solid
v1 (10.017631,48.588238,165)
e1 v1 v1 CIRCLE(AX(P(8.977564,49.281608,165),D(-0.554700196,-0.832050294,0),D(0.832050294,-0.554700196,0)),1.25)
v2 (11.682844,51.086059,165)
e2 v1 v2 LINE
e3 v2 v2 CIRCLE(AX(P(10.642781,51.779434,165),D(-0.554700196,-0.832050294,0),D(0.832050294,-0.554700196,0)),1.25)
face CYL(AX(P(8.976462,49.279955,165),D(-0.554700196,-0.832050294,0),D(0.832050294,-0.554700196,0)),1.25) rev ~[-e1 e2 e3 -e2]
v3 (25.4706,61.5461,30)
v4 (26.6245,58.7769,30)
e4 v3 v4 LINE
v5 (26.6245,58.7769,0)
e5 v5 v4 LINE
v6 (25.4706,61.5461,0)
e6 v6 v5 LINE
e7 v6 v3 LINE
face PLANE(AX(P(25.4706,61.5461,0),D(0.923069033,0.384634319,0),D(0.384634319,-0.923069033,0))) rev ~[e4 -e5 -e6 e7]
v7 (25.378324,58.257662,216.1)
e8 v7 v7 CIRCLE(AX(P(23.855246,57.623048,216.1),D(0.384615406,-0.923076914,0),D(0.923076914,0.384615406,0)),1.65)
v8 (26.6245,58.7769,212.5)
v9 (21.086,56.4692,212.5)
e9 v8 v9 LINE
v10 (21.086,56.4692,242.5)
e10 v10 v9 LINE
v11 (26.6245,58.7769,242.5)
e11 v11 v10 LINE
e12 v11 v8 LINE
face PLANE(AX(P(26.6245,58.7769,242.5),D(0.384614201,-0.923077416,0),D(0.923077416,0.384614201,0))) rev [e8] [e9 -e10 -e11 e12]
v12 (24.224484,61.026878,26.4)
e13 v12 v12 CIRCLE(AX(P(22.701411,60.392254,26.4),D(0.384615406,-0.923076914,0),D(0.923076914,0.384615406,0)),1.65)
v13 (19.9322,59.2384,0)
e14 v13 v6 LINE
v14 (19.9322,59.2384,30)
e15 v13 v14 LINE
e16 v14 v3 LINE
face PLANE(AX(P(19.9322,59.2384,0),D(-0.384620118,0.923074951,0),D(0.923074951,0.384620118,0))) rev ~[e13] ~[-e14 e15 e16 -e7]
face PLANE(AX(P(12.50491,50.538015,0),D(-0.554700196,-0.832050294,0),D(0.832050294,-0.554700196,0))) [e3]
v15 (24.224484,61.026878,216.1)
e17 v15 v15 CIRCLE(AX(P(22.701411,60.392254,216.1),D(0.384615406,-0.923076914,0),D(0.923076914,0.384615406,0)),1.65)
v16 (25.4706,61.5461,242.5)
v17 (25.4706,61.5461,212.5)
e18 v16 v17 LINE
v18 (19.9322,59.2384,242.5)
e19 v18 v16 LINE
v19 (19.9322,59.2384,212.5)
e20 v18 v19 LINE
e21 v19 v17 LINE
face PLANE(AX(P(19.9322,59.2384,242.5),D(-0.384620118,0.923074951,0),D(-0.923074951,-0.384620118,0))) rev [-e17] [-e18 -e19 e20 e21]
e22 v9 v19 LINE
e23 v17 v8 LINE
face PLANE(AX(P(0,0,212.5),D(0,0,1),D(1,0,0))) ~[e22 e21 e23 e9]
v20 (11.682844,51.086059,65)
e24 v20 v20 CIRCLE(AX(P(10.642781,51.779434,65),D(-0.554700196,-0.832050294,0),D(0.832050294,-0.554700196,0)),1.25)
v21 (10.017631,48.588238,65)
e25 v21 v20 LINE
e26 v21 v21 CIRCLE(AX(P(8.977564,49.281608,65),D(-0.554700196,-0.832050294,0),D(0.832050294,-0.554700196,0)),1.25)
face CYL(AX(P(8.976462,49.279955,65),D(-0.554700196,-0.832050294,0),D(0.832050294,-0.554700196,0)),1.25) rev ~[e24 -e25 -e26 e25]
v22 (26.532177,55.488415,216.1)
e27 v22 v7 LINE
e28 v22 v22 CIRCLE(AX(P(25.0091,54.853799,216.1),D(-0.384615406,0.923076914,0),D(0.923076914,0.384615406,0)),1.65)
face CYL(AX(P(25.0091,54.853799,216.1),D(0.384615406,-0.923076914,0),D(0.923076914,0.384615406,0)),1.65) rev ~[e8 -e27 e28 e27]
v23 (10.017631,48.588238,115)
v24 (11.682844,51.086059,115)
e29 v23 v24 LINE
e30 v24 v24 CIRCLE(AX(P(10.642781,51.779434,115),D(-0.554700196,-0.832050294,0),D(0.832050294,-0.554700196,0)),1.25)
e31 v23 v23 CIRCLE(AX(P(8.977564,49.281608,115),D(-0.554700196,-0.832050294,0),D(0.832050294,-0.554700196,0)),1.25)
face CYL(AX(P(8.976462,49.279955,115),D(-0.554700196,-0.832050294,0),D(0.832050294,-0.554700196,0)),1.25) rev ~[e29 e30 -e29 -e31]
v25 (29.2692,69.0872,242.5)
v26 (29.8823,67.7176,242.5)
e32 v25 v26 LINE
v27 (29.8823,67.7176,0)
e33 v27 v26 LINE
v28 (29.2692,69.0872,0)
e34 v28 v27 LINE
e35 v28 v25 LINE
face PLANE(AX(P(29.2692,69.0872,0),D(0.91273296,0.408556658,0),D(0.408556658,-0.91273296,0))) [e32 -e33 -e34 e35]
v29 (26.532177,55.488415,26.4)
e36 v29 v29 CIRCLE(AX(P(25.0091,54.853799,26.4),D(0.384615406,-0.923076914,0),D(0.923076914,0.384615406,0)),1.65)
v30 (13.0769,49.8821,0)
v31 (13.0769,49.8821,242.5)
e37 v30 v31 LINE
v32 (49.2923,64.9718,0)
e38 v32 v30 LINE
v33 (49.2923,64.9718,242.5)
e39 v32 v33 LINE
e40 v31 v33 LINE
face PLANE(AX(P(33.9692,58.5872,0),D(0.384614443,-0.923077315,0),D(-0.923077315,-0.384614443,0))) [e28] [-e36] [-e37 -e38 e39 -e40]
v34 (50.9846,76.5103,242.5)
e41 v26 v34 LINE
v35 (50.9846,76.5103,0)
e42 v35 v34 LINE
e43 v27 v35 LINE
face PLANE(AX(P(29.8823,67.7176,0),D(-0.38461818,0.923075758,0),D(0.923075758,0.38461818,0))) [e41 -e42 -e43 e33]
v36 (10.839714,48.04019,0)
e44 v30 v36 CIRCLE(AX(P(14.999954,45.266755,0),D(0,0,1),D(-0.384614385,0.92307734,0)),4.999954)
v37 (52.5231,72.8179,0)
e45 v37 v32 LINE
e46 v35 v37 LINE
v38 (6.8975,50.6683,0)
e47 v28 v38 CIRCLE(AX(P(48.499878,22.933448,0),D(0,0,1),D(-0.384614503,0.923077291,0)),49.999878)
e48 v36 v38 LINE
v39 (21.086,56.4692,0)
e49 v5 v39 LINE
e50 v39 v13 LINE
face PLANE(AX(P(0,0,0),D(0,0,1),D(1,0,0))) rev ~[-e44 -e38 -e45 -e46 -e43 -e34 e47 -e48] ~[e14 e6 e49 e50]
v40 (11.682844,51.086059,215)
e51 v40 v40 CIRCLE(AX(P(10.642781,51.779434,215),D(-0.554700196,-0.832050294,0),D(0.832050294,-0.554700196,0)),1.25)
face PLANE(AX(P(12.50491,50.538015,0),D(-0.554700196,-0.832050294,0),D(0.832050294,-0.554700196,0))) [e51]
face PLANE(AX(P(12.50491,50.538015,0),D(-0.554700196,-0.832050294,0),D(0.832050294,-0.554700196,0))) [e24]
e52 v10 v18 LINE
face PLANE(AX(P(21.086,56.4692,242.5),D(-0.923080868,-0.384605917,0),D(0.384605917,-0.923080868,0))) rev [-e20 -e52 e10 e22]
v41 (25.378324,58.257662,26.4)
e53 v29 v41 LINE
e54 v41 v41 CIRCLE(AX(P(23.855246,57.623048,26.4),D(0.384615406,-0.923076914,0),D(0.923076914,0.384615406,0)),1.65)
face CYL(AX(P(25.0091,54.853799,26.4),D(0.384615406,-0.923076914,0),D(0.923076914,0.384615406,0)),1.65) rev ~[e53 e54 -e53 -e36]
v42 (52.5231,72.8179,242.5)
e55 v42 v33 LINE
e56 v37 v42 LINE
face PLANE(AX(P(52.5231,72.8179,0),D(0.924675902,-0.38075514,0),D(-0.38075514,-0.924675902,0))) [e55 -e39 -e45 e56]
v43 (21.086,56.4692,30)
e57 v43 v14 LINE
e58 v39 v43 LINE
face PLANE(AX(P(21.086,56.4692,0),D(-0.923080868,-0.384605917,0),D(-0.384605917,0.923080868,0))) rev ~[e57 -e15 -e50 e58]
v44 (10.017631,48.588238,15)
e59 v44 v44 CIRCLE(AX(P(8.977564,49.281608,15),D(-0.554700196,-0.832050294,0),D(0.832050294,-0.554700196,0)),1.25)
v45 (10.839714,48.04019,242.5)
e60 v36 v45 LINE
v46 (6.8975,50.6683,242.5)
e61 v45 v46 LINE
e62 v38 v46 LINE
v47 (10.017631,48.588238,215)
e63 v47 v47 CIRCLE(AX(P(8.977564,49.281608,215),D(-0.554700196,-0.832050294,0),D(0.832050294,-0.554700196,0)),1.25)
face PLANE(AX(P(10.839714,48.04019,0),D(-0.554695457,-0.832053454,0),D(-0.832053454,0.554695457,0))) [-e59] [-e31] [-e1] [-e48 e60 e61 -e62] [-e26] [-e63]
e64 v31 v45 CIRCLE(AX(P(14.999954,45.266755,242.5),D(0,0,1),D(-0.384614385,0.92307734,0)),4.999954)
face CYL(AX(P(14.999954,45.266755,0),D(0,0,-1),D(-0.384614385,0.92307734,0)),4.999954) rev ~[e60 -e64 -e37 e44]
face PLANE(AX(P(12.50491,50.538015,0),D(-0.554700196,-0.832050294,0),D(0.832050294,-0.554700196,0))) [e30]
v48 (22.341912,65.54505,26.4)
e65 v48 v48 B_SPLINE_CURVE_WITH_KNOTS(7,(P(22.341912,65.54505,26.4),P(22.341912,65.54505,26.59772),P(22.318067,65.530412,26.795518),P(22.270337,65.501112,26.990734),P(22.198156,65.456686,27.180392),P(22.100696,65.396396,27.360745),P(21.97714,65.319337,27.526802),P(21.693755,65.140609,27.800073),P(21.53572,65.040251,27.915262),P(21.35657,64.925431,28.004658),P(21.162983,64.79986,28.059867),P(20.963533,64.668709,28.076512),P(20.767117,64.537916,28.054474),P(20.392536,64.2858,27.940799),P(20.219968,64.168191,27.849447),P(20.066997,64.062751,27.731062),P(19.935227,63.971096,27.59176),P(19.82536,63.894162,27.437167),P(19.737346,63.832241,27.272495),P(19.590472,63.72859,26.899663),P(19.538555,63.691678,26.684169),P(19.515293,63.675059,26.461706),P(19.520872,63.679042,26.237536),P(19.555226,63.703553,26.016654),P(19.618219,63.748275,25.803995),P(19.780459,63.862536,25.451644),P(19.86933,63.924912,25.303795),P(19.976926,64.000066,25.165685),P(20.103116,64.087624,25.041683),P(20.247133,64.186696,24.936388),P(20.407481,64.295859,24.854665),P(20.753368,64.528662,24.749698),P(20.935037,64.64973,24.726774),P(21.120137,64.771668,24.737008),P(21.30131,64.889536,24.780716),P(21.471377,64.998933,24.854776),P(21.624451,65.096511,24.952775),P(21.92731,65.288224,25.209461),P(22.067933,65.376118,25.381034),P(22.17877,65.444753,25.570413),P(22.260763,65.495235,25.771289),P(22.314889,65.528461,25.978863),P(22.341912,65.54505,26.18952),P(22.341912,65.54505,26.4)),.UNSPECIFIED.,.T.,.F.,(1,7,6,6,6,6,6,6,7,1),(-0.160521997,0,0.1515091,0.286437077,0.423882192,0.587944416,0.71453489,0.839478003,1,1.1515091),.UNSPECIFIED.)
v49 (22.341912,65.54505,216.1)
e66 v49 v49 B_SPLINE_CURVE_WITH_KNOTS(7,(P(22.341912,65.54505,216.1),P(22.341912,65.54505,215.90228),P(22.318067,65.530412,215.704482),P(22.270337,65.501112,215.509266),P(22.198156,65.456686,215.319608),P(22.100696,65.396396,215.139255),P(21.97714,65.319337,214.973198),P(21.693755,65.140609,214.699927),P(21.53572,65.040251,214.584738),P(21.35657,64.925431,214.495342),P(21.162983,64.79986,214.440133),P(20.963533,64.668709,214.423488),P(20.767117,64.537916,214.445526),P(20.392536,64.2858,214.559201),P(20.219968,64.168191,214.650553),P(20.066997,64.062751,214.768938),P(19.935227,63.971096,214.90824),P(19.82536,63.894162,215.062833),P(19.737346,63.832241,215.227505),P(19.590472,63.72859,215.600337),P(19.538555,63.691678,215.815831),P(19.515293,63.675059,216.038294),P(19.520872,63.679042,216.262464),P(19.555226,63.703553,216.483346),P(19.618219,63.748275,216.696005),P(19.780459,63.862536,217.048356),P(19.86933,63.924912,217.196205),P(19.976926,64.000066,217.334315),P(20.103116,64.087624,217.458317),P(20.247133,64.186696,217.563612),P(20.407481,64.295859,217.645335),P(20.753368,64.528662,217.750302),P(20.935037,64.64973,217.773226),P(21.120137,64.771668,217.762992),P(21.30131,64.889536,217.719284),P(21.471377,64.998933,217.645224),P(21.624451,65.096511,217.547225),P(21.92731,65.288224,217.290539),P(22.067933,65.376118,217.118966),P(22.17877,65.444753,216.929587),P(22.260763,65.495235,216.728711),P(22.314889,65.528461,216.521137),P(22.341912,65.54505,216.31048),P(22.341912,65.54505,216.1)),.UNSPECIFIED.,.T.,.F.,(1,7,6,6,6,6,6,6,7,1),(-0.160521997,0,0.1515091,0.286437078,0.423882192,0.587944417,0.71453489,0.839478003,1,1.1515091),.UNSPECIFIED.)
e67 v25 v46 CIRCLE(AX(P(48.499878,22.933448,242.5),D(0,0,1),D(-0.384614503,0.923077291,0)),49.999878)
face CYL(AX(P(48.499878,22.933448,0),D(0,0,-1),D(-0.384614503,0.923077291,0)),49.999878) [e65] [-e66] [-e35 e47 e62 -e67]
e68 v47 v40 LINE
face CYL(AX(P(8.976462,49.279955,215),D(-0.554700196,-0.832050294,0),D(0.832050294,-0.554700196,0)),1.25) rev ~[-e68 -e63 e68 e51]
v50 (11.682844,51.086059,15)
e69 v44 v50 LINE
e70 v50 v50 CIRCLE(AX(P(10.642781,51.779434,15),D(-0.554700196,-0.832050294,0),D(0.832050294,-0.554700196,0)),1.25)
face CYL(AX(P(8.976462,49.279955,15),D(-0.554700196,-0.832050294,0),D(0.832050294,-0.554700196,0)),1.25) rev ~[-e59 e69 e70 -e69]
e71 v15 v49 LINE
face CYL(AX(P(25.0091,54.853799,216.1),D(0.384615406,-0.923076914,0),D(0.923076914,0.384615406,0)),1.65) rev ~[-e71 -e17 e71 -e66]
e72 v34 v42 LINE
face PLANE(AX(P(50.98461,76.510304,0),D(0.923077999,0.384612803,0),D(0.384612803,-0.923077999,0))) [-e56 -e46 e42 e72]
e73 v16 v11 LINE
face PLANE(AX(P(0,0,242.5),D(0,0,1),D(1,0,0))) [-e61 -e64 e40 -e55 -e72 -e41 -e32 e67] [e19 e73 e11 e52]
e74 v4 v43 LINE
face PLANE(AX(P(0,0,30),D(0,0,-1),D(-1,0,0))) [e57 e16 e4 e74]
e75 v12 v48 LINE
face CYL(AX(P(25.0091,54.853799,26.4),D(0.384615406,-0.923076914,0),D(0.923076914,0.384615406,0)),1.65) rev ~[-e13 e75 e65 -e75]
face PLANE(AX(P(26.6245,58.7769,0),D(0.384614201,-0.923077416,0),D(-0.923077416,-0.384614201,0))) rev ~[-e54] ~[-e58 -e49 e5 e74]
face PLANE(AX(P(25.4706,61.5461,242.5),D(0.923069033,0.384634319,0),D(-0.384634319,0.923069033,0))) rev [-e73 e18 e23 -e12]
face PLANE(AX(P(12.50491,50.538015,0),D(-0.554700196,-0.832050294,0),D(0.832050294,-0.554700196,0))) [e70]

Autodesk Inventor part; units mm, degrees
ref_plane "YZ Plane" through (0, 0, 0) normal (1, 0, 0) x (0, 1, 0)
ref_plane "XZ Plane" through (0, 0, 0) normal (0, 1, 0) x (-1, 0, 0)
sketch "Sketch1" plane through (0, 0, 0) normal (0, 0, 1) x (1, 0, 0)
  line L0 (10, 0) -> (-1.5, 0) projected
  line L1 (10, 45.2667) -> (10, 0) projected
  arc A0 (13.0769, 49.8821) -> (10, 45.2667) centre (15, 45.2667) ccw projected
  line L2 (54.8615, 67.2923) -> (13.0769, 49.8821) projected
  line L3 (50.4385, 77.9077) -> (54.8615, 67.2923) projected
  line L4 (50.4385, 77.9077) -> (29.2692, 69.0872) projected
  arc A1 (29.2692, 69.0872) -> (-1.5, 22.9333) centre (48.5, 22.9333) ccw projected
  line L5 (-1.5, 0) -> (-1.5, 22.9333) projected
  line L6 (29.2692, 69.0872) -> (33.9692, 58.5872)
  line L7 (15, 45.2667) -> (6.8975, 50.6683)
  line L8 (29.2692, 69.0872) -> (50.4077, 77.8949)
  line L9 (50.4077, 77.8949) -> (52.5231, 72.8179)
  line L10 (52.5231, 72.8179) -> (49.2923, 64.9718)
  line L11 (29.8823, 67.7176) -> (50.9846, 76.5103)
  point P0 (0, 0)
  point P1 (10.8397, 48.0402)
  dimension "d2" = 22.9
  dimension "d3" = 5.5
  dimension "d4" = 45
  dimension "d5" = 1.5
extrude "Extrusion1" add sketch "Sketch1" along normal blind 242.5 contours L7 A1 L6 L2 A0 | L6 L11 L9 L10 L2
sketch "Sketch2" plane through (10.8397, 48.0402, 0) normal (-0.5547002, -0.8320503, 0) x (0.8320503, -0.5547002, 0)
  line L0 (-4.738, 0) -> (0, 0) projected
  line L1 (0, 0) -> (0, 242.5) projected
  line L2 (-4.738, 242.5) -> (0, 242.5) projected
  line L3 (-4.738, 0) -> (-4.738, 242.5) projected
  circle A0 centre (-2.238, 15) radius 1.25
  circle A1 centre (-2.238, 65) radius 1.25
  circle A2 centre (-2.238, 115) radius 1.25
  circle A3 centre (-2.238, 165) radius 1.25
  circle A4 centre (-2.238, 215) radius 1.25
  point P0 (17.6287, 0)
  dimension "d6" = 2.5
  dimension "d7" = 2.5
  dimension "d8" = 15
  dimension "d11" = 50
extrude "Extrusion2" cut sketch "Sketch2" against normal blind 3 contours A0 | A1 | A2 | A3 | A4
sketch "Sketch3" plane through (0, 0, 0) normal (0, 0, -1) x (-1, 0, 0)
  line L0 (-13.0769, 49.8821) -> (-49.2923, 64.9718) projected
  line L1 (-26.6245, 58.7769) -> (-21.086, 56.4692)
  line L2 (-21.086, 56.4692) -> (-19.9322, 59.2384)
  line L3 (-19.9322, 59.2384) -> (-25.4706, 61.5461)
  line L4 (-25.4706, 61.5461) -> (-26.6245, 58.7769)
  arc A0 (-10.8397, 48.0402) -> (-13.0769, 49.8821) centre (-15, 45.2667) ccw projected
  line L5 (-6.8975, 50.6683) -> (-10.8397, 48.0402) projected
  arc A1 (-6.8975, 50.6683) -> (-29.2692, 69.0872) centre (-48.5, 22.9333) ccw projected
  line L6 (-29.8823, 67.7176) -> (-29.2692, 69.0872) projected
  line L7 (-50.9846, 76.5103) -> (-29.8823, 67.7176) projected
  line L8 (-52.5231, 72.8179) -> (-50.9846, 76.5103) projected
  line L9 (-49.2923, 64.9718) -> (-52.5231, 72.8179) projected
  line L10 (-13.0769, 49.8821) -> (-49.2923, 64.9718) projected
  point P0 (0, 0)
  dimension "d20" = 6
  dimension "d21" = 3
  dimension "d22" = 3
  dimension "d32" = 12.7
extrude "Extrusion3" cut sketch "Sketch3" against normal blind 30 contours L4 L3 L2 L1
sketch "Sketch4" plane through (49.2923, 64.9718, 0) normal (0.3846154, -0.9230769, 0) x (0.9230769, 0.3846154, 0)
  line L0 (-29.3068, 0) -> (-23.3068, 0) projected
  line L1 (-29.3068, 0) -> (-29.3068, 30) projected
  line L2 (-29.3068, 30) -> (-23.3068, 30) projected
  line L3 (-23.3068, 0) -> (-23.3068, 30) projected
  circle A0 centre (-26.3068, 26.4) radius 1.65
  line L4 (-26.3068, 29.7486) -> (-23.4068, 28.0743)
  line L5 (-23.4068, 28.0743) -> (-23.4068, 24.7257)
  line L6 (-23.4068, 24.7257) -> (-26.3068, 23.0514)
  line L7 (-26.3068, 23.0514) -> (-29.2068, 24.7257)
  line L8 (-29.2068, 24.7257) -> (-29.2068, 28.0743)
  line L9 (-29.2068, 28.0743) -> (-26.3068, 29.7486)
  point P0 (-70.4897, 0)
  point P1 (-26.3068, 30)
  dimension "d26" = 3.3
  dimension "d27" = 3.6
  dimension "d28" = 5.8
extrude "Extrusion4" cut sketch "Sketch4" against normal through all contours A0
ref_plane "Work Plane1" through (0, 0, 121.25) normal (0, 0, -1) x (-1, 0, 0)
mirror "Mirror1" about plane through (0, 0, 121.25) normal (0, 0, -1) of "Extrusion4", "Extrusion3"
properties part number "ESQUINA_REDONDEADA_R50"
